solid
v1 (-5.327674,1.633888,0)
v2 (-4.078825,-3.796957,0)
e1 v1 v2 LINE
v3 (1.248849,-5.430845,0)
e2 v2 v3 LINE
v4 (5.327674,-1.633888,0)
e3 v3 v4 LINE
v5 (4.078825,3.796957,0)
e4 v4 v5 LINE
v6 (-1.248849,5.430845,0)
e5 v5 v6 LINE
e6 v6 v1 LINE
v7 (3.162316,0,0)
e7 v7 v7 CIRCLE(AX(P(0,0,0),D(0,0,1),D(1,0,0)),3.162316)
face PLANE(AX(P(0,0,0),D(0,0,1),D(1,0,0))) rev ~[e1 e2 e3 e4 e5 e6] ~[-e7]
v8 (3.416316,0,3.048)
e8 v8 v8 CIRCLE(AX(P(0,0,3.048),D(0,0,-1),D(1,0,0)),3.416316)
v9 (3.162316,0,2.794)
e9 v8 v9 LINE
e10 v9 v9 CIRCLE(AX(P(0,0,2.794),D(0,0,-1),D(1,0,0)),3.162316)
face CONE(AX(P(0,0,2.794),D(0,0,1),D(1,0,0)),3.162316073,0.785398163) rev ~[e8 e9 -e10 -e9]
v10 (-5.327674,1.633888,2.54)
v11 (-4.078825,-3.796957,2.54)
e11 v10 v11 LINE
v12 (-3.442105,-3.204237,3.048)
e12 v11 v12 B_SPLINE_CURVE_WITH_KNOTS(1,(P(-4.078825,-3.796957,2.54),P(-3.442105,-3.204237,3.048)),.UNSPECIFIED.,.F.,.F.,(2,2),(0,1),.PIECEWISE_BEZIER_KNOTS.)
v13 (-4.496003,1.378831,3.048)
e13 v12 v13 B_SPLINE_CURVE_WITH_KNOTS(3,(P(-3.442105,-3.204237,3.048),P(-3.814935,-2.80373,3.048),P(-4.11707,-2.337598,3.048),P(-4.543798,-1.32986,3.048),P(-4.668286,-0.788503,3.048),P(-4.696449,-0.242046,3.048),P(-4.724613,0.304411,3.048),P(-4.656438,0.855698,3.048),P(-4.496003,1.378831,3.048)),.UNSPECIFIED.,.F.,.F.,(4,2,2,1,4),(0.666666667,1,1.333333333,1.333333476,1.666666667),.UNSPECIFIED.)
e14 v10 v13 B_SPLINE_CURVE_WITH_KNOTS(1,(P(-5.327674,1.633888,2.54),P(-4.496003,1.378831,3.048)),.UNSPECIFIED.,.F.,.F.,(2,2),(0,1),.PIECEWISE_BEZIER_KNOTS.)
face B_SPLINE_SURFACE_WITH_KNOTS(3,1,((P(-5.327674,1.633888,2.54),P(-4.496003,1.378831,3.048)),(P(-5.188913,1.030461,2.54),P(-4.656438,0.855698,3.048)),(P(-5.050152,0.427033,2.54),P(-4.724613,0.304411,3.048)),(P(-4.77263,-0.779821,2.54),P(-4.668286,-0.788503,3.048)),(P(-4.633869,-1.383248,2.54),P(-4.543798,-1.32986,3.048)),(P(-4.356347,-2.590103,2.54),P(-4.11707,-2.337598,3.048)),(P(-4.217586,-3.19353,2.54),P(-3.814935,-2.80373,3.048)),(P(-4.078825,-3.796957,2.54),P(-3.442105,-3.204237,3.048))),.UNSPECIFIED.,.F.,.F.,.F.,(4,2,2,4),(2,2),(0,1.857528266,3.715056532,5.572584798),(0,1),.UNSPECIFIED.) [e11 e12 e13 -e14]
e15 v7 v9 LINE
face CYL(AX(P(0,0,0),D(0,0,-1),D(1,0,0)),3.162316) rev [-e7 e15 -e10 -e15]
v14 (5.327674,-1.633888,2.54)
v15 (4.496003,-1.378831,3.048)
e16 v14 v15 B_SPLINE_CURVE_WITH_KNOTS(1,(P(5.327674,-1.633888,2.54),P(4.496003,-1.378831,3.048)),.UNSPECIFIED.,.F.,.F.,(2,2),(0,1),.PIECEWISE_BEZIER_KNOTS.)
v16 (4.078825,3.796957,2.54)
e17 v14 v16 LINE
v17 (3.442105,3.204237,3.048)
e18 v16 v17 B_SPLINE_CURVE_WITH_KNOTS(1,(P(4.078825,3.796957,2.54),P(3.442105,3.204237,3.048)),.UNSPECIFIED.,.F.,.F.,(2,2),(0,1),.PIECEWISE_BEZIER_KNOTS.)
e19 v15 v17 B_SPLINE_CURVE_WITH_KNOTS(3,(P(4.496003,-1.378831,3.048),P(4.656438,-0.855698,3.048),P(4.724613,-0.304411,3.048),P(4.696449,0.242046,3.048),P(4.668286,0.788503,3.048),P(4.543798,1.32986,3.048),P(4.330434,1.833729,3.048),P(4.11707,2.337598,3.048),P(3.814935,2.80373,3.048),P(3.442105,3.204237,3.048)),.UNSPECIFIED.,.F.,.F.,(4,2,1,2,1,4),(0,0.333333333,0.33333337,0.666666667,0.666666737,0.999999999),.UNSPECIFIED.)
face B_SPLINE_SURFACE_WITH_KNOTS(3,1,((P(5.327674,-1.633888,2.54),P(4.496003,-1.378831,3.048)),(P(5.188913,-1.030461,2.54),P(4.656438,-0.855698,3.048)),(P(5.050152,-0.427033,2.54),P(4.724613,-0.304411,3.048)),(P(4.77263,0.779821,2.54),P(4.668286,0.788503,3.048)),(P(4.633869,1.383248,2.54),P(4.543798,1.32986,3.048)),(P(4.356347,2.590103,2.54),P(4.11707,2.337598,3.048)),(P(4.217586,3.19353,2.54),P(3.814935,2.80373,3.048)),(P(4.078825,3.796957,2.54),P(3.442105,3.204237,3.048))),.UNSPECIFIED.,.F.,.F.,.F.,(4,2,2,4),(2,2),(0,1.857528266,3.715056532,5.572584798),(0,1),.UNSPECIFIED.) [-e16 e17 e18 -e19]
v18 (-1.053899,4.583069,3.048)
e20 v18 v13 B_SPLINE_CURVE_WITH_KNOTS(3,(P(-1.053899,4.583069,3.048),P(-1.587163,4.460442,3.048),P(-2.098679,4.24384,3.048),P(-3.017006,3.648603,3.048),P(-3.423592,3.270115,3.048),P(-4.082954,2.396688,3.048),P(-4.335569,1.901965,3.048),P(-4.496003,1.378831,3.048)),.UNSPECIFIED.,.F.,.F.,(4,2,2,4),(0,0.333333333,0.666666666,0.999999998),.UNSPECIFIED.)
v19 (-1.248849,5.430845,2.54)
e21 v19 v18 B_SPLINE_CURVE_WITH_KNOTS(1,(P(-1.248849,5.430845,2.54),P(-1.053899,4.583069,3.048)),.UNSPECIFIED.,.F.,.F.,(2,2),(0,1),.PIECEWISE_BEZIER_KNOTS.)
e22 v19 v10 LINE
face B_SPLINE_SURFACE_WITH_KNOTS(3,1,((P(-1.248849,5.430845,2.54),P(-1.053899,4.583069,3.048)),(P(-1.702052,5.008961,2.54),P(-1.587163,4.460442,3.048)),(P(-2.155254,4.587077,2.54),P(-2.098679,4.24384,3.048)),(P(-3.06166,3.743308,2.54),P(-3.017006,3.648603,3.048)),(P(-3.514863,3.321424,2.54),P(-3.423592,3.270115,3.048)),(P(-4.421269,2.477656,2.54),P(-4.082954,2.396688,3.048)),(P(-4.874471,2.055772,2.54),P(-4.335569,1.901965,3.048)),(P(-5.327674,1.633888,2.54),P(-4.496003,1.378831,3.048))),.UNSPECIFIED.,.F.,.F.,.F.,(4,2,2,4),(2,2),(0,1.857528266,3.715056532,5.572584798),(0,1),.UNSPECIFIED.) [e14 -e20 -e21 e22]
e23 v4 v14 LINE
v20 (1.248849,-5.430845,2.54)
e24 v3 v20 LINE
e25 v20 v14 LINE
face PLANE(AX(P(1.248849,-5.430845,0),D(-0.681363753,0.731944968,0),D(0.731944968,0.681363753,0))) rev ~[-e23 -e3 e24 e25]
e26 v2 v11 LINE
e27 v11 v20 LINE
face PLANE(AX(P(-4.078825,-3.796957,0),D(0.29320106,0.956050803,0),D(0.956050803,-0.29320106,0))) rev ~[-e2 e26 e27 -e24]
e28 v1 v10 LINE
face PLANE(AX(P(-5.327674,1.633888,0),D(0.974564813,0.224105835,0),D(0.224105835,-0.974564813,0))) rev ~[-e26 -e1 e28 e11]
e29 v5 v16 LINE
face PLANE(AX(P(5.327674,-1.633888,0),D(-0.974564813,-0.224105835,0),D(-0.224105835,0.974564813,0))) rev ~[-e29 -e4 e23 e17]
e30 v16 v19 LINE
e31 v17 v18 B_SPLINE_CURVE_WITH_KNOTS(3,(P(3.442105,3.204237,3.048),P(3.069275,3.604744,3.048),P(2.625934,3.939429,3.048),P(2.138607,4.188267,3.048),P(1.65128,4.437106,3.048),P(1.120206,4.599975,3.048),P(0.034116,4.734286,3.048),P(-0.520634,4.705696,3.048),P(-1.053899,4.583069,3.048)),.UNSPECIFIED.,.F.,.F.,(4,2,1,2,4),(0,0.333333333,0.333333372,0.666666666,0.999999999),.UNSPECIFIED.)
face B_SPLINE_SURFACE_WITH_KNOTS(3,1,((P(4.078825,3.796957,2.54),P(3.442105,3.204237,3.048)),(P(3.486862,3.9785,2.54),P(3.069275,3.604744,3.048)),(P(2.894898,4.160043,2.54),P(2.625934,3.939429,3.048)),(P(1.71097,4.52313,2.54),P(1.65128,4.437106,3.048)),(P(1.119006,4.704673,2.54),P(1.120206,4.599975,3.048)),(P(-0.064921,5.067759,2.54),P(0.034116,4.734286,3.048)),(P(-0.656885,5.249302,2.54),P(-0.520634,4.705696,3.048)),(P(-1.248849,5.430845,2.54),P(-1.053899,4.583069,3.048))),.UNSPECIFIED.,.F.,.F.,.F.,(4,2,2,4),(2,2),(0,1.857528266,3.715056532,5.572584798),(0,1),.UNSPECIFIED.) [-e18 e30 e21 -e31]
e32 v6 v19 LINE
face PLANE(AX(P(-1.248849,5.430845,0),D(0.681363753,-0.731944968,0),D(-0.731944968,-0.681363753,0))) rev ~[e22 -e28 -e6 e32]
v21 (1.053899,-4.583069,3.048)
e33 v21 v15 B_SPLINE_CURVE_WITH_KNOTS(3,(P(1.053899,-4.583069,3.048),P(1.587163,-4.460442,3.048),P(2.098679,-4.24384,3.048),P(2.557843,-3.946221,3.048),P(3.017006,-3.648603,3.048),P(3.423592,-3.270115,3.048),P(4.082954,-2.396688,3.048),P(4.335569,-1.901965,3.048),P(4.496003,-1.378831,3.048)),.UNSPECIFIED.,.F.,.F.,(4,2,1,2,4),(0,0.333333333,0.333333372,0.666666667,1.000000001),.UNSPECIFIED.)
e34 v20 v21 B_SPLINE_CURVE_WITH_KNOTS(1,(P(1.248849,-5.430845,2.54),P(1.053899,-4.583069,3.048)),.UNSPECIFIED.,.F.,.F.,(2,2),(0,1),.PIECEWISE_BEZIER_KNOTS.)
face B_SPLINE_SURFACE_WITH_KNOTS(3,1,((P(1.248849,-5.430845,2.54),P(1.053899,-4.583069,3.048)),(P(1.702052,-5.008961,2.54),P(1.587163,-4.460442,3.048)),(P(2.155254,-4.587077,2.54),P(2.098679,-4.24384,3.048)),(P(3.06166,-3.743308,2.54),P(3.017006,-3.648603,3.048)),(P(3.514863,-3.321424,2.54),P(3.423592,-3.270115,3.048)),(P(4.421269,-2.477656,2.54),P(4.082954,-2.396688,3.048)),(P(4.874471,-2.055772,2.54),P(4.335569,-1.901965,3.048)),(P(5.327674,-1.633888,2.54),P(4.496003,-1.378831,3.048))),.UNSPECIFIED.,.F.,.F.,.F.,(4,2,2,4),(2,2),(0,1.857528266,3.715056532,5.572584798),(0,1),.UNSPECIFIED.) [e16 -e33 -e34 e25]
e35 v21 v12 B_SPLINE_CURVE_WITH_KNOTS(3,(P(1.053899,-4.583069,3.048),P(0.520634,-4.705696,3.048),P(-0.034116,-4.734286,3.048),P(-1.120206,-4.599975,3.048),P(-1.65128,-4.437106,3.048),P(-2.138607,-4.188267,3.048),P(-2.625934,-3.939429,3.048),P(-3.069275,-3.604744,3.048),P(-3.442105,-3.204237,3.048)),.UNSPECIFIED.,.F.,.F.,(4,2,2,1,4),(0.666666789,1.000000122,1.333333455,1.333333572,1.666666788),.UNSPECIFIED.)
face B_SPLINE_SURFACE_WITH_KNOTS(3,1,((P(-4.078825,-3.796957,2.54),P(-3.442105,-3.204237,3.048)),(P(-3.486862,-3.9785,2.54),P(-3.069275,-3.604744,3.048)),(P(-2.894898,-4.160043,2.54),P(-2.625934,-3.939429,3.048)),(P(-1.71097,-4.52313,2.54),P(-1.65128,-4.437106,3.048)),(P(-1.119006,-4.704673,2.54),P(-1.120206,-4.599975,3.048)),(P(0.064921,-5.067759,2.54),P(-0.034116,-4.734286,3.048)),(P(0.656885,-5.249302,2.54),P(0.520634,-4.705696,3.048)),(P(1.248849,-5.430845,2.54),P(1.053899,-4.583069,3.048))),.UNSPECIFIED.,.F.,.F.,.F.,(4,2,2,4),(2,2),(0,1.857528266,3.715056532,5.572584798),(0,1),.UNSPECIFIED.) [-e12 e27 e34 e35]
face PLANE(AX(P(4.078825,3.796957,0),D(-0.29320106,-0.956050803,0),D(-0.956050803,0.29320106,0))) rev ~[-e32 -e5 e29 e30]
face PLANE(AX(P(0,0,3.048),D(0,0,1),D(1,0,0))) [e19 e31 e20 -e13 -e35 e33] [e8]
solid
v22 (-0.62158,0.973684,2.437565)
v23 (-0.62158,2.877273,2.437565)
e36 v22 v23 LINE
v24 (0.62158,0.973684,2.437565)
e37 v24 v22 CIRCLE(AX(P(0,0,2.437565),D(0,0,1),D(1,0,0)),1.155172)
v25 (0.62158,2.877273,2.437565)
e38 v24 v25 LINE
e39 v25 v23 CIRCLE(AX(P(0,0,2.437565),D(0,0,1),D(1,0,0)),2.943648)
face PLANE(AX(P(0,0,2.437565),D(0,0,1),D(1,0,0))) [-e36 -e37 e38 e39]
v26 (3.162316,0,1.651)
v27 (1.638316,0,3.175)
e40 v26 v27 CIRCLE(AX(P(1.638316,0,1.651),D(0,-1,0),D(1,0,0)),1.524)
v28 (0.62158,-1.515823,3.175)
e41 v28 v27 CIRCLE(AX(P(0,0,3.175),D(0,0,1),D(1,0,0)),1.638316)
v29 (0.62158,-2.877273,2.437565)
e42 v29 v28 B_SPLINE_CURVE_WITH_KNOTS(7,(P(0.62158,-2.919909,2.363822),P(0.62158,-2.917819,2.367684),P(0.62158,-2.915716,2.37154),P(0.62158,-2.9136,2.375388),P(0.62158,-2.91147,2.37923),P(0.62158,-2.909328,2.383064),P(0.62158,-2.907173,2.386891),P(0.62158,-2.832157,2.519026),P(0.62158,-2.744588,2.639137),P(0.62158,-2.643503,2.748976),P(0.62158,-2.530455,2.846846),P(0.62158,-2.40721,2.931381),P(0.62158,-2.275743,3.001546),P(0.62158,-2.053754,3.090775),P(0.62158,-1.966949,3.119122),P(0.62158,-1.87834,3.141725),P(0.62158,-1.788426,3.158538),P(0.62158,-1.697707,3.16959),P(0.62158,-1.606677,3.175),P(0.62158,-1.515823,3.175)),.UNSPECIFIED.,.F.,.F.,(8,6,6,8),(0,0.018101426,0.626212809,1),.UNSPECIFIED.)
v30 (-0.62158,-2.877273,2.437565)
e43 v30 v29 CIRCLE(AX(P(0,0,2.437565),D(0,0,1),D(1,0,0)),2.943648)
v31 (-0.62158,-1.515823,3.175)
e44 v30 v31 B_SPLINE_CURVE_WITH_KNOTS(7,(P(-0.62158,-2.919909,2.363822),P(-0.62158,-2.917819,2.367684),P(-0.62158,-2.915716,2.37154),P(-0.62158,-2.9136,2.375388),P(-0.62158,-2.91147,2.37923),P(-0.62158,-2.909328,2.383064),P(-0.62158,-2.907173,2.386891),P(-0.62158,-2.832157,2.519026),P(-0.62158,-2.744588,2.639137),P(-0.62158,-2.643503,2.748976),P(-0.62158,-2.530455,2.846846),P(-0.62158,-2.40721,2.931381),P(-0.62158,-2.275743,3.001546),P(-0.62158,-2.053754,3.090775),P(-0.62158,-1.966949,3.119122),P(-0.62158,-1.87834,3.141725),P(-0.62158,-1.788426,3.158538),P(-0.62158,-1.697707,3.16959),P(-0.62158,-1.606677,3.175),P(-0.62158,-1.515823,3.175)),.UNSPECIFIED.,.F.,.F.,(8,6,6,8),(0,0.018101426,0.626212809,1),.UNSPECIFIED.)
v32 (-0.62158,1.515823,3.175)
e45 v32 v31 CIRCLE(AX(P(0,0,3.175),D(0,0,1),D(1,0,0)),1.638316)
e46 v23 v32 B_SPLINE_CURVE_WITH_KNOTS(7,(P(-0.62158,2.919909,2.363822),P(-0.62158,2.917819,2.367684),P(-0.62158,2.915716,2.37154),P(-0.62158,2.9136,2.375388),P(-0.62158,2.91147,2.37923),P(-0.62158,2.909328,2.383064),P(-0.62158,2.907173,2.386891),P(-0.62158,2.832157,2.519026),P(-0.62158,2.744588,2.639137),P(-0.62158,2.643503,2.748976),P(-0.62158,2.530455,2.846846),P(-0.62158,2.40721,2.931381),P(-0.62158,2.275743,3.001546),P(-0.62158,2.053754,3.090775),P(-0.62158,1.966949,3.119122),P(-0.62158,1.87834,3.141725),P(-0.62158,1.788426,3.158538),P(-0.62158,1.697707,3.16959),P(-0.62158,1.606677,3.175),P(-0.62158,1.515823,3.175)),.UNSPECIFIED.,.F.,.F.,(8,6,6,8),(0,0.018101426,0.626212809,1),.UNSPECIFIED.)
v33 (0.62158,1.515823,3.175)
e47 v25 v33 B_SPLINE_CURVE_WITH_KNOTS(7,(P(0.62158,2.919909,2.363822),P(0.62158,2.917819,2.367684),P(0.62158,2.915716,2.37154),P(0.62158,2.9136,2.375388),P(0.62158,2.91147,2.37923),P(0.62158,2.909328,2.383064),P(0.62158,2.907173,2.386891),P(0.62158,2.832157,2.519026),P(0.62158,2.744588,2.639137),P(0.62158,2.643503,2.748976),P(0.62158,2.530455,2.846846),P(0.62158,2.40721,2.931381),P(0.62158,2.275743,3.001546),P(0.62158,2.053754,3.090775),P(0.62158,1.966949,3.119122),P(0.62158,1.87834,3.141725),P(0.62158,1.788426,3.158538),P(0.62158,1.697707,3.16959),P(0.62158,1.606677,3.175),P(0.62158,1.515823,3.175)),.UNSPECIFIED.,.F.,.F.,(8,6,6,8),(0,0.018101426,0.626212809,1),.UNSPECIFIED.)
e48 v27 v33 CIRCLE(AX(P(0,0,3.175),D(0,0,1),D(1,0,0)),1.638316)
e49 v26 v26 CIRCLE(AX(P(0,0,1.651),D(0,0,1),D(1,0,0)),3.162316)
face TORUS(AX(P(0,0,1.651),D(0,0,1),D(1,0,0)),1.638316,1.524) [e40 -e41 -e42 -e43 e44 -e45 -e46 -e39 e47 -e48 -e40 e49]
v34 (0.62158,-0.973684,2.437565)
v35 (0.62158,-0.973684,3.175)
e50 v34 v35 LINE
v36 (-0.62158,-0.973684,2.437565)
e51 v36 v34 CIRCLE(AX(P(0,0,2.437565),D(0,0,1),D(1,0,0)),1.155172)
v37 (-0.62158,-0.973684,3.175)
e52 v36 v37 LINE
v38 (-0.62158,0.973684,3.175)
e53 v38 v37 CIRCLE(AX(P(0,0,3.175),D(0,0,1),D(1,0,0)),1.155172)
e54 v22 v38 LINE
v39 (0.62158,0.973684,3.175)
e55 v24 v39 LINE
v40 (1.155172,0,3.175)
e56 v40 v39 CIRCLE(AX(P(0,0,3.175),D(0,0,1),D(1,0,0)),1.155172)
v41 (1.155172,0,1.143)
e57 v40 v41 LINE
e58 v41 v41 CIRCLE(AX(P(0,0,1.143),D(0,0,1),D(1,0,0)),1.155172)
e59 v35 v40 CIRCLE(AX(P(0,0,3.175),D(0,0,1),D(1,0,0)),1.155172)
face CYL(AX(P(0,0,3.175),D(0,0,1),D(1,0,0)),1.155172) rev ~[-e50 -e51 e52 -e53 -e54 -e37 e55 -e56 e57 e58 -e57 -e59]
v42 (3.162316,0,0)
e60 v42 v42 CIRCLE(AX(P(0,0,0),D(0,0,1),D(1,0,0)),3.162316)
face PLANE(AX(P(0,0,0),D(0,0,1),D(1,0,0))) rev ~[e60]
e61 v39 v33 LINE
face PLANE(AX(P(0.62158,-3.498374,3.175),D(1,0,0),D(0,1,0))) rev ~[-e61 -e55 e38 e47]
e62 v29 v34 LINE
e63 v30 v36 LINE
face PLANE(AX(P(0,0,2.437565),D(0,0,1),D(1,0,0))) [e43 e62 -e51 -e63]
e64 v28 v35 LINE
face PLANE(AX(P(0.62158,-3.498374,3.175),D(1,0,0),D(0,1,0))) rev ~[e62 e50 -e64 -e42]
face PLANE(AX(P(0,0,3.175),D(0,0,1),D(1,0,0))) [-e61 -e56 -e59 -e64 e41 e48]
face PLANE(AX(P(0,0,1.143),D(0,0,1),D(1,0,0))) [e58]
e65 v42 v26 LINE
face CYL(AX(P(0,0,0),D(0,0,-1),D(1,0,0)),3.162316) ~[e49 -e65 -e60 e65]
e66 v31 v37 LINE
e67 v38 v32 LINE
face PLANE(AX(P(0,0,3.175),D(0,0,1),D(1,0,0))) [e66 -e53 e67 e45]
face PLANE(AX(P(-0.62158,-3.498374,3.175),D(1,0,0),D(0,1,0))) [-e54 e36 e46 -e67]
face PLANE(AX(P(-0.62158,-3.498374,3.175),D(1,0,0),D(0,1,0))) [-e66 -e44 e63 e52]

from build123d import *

# Parameters (mm, degrees)
F3_DEPTH  = 2.54
F1_R      = 4.7026824454
F4_DEPTH  = 3.048
F2_R      = 3.1623160727
F6_DEPTH  = 5.08
F7_SIZE   = 0.254
F8_DEPTH  = 3.175
F9_R      = 1.524
F10_W     = 1.2431591749
F10_H     = 6.996748969
F11_DEPTH = 0.7374347188
F12_R     = 1.1551720175
F13_DEPTH = 2.032


# Not quite as in the source:
# - the arcs of a loft's sections are written as splines that run evenly, so that the points pair up as in the source's solid


with BuildPart() as f3:
    # F0 (on Top) → F3 (new body)
    with BuildSketch(Plane.XY):
        Polygon((1.2488487713, -5.4308450613), (5.3276741728, -1.6338877692), (4.0788254014, 3.7969572921), (-1.2488487713, 5.4308450613), (-5.3276741728, 1.6338877692), (-4.0788254014, -3.7969572921), align=None)
    extrude(amount=F3_DEPTH)



with BuildPart() as f4:
    # F1 (on Top) → F4 (new body)
    with BuildSketch(Plane.XY):
        Circle(F1_R)
    extrude(amount=F4_DEPTH)


with BuildPart() as f3_1:
    add(f3.part)

    add(f4.part)  # F5 merges F4
    # F3_face (on face) → F5 section 0
    with BuildSketch(Plane.XY.offset(2.54)):
        Polygon((-5.3276741728, 1.6338877692), (-4.0788254014, -3.7969572921), (1.2488487713, -5.4308450613), (5.3276741728, -1.6338877692), (4.0788254014, 3.7969572921), (-1.2488487713, 5.4308450613), align=None)
    # F4_face (on face) → F5 section 1
    with BuildSketch(Plane.XY.offset(3.048)):
        with BuildLine():
            add(Edge.make_bspline(
                [(-4.4960033295, 1.3788314773), (-4.6564376569, 0.8556977355), (-4.7246126151, 0.30441075), (-4.6682859675, -0.7885026272), (-4.5437982188, -1.3298601483), (-4.1170700938, -2.3375979359), (-3.814934698, -2.8037302861), (-3.4421047517, -3.2042373602)],
                knots=[0, 0, 0, 0, 0.3333333333, 0.3333333333, 0.6666666667, 0.6666666667, 1, 1, 1, 1], degree=3))
            add(Edge.make_bspline(
                [(-3.4421047517, -3.2042373602), (-3.0692748053, -3.6047444343), (-2.6259337502, -3.9394291727), (-1.6512796777, -4.4371055536), (-1.1202064375, -4.5999747613), (-0.0341158506, -4.7342862584), (0.5206343041, -4.7056955053), (1.0538985779, -4.5830688375)],
                knots=[0, 0, 0, 0, 0.3333333333, 0.3333333333, 0.6666666667, 0.6666666667, 1, 1, 1, 1], degree=3))
            add(Edge.make_bspline(
                [(1.0538985779, -4.5830688375), (1.5871628516, -4.4604421698), (2.0986788649, -4.2438399227), (3.0170062898, -3.6486029264), (3.4235917813, -3.270114613), (4.0829542432, -2.3966883224), (4.3355690021, -1.9019652192), (4.4960033295, -1.3788314773)],
                knots=[0, 0, 0, 0, 0.3333333333, 0.3333333333, 0.6666666667, 0.6666666667, 1, 1, 1, 1], degree=3))
            add(Edge.make_bspline(
                [(4.4960033295, -1.3788314773), (4.6564376569, -0.8556977355), (4.7246126151, -0.30441075), (4.6682859675, 0.7885026272), (4.5437982188, 1.3298601483), (4.1170700938, 2.3375979359), (3.814934698, 2.8037302861), (3.4421047517, 3.2042373602)],
                knots=[0, 0, 0, 0, 0.3333333333, 0.3333333333, 0.6666666667, 0.6666666667, 1, 1, 1, 1], degree=3))
            add(Edge.make_bspline(
                [(3.4421047517, 3.2042373602), (3.0692748053, 3.6047444343), (2.6259337502, 3.9394291727), (1.6512796777, 4.4371055536), (1.1202064375, 4.5999747613), (0.0341158506, 4.7342862584), (-0.5206343041, 4.7056955053), (-1.0538985779, 4.5830688375)],
                knots=[0, 0, 0, 0, 0.3333333333, 0.3333333333, 0.6666666667, 0.6666666667, 1, 1, 1, 1], degree=3))
            add(Edge.make_bspline(
                [(-1.0538985779, 4.5830688375), (-1.5871628516, 4.4604421698), (-2.0986788649, 4.2438399227), (-3.0170062898, 3.6486029264), (-3.4235917813, 3.270114613), (-4.0829542432, 2.3966883224), (-4.3355690021, 1.9019652192), (-4.4960033295, 1.3788314773)],
                knots=[0, 0, 0, 0, 0.3333333333, 0.3333333333, 0.6666666667, 0.6666666667, 1, 1, 1, 1], degree=3))
        make_face()
    loft(ruled=True)

    # F2 (on Top) → F6 (cut)
    with BuildSketch(Plane.XY):
        Circle(F2_R)
    extrude(amount=F6_DEPTH, mode=Mode.SUBTRACT)

    # F7
    f7_edges = [f3_1.edges().sort_by_distance(p)[0] for p in [
        (-3.162316, 0, 3.048),
    ]]
    chamfer(f7_edges, length=F7_SIZE)


with BuildPart() as f8:
    # F2 (on Top) → F8 (new body)
    with BuildSketch(Plane.XY):
        Circle(F2_R)
    extrude(amount=F8_DEPTH)

    # F9
    f9_edges = [f8.edges().sort_by_distance(p)[0] for p in [
        (-3.162316, 0, 3.175),
    ]]
    fillet(f9_edges, radius=F9_R)

    # F10 (on face) → F11 (cut)
    with BuildSketch(Plane.XY.offset(3.175)):
        Rectangle(F10_W, F10_H)
    extrude(amount=-F11_DEPTH, mode=Mode.SUBTRACT)

    # F12 (on face) → F13 (cut)
    with BuildSketch(Plane.XY.offset(3.175)):
        Circle(F12_R)
    extrude(amount=-F13_DEPTH, mode=Mode.SUBTRACT)


solid = Compound([f3_1.part, f8.part])
